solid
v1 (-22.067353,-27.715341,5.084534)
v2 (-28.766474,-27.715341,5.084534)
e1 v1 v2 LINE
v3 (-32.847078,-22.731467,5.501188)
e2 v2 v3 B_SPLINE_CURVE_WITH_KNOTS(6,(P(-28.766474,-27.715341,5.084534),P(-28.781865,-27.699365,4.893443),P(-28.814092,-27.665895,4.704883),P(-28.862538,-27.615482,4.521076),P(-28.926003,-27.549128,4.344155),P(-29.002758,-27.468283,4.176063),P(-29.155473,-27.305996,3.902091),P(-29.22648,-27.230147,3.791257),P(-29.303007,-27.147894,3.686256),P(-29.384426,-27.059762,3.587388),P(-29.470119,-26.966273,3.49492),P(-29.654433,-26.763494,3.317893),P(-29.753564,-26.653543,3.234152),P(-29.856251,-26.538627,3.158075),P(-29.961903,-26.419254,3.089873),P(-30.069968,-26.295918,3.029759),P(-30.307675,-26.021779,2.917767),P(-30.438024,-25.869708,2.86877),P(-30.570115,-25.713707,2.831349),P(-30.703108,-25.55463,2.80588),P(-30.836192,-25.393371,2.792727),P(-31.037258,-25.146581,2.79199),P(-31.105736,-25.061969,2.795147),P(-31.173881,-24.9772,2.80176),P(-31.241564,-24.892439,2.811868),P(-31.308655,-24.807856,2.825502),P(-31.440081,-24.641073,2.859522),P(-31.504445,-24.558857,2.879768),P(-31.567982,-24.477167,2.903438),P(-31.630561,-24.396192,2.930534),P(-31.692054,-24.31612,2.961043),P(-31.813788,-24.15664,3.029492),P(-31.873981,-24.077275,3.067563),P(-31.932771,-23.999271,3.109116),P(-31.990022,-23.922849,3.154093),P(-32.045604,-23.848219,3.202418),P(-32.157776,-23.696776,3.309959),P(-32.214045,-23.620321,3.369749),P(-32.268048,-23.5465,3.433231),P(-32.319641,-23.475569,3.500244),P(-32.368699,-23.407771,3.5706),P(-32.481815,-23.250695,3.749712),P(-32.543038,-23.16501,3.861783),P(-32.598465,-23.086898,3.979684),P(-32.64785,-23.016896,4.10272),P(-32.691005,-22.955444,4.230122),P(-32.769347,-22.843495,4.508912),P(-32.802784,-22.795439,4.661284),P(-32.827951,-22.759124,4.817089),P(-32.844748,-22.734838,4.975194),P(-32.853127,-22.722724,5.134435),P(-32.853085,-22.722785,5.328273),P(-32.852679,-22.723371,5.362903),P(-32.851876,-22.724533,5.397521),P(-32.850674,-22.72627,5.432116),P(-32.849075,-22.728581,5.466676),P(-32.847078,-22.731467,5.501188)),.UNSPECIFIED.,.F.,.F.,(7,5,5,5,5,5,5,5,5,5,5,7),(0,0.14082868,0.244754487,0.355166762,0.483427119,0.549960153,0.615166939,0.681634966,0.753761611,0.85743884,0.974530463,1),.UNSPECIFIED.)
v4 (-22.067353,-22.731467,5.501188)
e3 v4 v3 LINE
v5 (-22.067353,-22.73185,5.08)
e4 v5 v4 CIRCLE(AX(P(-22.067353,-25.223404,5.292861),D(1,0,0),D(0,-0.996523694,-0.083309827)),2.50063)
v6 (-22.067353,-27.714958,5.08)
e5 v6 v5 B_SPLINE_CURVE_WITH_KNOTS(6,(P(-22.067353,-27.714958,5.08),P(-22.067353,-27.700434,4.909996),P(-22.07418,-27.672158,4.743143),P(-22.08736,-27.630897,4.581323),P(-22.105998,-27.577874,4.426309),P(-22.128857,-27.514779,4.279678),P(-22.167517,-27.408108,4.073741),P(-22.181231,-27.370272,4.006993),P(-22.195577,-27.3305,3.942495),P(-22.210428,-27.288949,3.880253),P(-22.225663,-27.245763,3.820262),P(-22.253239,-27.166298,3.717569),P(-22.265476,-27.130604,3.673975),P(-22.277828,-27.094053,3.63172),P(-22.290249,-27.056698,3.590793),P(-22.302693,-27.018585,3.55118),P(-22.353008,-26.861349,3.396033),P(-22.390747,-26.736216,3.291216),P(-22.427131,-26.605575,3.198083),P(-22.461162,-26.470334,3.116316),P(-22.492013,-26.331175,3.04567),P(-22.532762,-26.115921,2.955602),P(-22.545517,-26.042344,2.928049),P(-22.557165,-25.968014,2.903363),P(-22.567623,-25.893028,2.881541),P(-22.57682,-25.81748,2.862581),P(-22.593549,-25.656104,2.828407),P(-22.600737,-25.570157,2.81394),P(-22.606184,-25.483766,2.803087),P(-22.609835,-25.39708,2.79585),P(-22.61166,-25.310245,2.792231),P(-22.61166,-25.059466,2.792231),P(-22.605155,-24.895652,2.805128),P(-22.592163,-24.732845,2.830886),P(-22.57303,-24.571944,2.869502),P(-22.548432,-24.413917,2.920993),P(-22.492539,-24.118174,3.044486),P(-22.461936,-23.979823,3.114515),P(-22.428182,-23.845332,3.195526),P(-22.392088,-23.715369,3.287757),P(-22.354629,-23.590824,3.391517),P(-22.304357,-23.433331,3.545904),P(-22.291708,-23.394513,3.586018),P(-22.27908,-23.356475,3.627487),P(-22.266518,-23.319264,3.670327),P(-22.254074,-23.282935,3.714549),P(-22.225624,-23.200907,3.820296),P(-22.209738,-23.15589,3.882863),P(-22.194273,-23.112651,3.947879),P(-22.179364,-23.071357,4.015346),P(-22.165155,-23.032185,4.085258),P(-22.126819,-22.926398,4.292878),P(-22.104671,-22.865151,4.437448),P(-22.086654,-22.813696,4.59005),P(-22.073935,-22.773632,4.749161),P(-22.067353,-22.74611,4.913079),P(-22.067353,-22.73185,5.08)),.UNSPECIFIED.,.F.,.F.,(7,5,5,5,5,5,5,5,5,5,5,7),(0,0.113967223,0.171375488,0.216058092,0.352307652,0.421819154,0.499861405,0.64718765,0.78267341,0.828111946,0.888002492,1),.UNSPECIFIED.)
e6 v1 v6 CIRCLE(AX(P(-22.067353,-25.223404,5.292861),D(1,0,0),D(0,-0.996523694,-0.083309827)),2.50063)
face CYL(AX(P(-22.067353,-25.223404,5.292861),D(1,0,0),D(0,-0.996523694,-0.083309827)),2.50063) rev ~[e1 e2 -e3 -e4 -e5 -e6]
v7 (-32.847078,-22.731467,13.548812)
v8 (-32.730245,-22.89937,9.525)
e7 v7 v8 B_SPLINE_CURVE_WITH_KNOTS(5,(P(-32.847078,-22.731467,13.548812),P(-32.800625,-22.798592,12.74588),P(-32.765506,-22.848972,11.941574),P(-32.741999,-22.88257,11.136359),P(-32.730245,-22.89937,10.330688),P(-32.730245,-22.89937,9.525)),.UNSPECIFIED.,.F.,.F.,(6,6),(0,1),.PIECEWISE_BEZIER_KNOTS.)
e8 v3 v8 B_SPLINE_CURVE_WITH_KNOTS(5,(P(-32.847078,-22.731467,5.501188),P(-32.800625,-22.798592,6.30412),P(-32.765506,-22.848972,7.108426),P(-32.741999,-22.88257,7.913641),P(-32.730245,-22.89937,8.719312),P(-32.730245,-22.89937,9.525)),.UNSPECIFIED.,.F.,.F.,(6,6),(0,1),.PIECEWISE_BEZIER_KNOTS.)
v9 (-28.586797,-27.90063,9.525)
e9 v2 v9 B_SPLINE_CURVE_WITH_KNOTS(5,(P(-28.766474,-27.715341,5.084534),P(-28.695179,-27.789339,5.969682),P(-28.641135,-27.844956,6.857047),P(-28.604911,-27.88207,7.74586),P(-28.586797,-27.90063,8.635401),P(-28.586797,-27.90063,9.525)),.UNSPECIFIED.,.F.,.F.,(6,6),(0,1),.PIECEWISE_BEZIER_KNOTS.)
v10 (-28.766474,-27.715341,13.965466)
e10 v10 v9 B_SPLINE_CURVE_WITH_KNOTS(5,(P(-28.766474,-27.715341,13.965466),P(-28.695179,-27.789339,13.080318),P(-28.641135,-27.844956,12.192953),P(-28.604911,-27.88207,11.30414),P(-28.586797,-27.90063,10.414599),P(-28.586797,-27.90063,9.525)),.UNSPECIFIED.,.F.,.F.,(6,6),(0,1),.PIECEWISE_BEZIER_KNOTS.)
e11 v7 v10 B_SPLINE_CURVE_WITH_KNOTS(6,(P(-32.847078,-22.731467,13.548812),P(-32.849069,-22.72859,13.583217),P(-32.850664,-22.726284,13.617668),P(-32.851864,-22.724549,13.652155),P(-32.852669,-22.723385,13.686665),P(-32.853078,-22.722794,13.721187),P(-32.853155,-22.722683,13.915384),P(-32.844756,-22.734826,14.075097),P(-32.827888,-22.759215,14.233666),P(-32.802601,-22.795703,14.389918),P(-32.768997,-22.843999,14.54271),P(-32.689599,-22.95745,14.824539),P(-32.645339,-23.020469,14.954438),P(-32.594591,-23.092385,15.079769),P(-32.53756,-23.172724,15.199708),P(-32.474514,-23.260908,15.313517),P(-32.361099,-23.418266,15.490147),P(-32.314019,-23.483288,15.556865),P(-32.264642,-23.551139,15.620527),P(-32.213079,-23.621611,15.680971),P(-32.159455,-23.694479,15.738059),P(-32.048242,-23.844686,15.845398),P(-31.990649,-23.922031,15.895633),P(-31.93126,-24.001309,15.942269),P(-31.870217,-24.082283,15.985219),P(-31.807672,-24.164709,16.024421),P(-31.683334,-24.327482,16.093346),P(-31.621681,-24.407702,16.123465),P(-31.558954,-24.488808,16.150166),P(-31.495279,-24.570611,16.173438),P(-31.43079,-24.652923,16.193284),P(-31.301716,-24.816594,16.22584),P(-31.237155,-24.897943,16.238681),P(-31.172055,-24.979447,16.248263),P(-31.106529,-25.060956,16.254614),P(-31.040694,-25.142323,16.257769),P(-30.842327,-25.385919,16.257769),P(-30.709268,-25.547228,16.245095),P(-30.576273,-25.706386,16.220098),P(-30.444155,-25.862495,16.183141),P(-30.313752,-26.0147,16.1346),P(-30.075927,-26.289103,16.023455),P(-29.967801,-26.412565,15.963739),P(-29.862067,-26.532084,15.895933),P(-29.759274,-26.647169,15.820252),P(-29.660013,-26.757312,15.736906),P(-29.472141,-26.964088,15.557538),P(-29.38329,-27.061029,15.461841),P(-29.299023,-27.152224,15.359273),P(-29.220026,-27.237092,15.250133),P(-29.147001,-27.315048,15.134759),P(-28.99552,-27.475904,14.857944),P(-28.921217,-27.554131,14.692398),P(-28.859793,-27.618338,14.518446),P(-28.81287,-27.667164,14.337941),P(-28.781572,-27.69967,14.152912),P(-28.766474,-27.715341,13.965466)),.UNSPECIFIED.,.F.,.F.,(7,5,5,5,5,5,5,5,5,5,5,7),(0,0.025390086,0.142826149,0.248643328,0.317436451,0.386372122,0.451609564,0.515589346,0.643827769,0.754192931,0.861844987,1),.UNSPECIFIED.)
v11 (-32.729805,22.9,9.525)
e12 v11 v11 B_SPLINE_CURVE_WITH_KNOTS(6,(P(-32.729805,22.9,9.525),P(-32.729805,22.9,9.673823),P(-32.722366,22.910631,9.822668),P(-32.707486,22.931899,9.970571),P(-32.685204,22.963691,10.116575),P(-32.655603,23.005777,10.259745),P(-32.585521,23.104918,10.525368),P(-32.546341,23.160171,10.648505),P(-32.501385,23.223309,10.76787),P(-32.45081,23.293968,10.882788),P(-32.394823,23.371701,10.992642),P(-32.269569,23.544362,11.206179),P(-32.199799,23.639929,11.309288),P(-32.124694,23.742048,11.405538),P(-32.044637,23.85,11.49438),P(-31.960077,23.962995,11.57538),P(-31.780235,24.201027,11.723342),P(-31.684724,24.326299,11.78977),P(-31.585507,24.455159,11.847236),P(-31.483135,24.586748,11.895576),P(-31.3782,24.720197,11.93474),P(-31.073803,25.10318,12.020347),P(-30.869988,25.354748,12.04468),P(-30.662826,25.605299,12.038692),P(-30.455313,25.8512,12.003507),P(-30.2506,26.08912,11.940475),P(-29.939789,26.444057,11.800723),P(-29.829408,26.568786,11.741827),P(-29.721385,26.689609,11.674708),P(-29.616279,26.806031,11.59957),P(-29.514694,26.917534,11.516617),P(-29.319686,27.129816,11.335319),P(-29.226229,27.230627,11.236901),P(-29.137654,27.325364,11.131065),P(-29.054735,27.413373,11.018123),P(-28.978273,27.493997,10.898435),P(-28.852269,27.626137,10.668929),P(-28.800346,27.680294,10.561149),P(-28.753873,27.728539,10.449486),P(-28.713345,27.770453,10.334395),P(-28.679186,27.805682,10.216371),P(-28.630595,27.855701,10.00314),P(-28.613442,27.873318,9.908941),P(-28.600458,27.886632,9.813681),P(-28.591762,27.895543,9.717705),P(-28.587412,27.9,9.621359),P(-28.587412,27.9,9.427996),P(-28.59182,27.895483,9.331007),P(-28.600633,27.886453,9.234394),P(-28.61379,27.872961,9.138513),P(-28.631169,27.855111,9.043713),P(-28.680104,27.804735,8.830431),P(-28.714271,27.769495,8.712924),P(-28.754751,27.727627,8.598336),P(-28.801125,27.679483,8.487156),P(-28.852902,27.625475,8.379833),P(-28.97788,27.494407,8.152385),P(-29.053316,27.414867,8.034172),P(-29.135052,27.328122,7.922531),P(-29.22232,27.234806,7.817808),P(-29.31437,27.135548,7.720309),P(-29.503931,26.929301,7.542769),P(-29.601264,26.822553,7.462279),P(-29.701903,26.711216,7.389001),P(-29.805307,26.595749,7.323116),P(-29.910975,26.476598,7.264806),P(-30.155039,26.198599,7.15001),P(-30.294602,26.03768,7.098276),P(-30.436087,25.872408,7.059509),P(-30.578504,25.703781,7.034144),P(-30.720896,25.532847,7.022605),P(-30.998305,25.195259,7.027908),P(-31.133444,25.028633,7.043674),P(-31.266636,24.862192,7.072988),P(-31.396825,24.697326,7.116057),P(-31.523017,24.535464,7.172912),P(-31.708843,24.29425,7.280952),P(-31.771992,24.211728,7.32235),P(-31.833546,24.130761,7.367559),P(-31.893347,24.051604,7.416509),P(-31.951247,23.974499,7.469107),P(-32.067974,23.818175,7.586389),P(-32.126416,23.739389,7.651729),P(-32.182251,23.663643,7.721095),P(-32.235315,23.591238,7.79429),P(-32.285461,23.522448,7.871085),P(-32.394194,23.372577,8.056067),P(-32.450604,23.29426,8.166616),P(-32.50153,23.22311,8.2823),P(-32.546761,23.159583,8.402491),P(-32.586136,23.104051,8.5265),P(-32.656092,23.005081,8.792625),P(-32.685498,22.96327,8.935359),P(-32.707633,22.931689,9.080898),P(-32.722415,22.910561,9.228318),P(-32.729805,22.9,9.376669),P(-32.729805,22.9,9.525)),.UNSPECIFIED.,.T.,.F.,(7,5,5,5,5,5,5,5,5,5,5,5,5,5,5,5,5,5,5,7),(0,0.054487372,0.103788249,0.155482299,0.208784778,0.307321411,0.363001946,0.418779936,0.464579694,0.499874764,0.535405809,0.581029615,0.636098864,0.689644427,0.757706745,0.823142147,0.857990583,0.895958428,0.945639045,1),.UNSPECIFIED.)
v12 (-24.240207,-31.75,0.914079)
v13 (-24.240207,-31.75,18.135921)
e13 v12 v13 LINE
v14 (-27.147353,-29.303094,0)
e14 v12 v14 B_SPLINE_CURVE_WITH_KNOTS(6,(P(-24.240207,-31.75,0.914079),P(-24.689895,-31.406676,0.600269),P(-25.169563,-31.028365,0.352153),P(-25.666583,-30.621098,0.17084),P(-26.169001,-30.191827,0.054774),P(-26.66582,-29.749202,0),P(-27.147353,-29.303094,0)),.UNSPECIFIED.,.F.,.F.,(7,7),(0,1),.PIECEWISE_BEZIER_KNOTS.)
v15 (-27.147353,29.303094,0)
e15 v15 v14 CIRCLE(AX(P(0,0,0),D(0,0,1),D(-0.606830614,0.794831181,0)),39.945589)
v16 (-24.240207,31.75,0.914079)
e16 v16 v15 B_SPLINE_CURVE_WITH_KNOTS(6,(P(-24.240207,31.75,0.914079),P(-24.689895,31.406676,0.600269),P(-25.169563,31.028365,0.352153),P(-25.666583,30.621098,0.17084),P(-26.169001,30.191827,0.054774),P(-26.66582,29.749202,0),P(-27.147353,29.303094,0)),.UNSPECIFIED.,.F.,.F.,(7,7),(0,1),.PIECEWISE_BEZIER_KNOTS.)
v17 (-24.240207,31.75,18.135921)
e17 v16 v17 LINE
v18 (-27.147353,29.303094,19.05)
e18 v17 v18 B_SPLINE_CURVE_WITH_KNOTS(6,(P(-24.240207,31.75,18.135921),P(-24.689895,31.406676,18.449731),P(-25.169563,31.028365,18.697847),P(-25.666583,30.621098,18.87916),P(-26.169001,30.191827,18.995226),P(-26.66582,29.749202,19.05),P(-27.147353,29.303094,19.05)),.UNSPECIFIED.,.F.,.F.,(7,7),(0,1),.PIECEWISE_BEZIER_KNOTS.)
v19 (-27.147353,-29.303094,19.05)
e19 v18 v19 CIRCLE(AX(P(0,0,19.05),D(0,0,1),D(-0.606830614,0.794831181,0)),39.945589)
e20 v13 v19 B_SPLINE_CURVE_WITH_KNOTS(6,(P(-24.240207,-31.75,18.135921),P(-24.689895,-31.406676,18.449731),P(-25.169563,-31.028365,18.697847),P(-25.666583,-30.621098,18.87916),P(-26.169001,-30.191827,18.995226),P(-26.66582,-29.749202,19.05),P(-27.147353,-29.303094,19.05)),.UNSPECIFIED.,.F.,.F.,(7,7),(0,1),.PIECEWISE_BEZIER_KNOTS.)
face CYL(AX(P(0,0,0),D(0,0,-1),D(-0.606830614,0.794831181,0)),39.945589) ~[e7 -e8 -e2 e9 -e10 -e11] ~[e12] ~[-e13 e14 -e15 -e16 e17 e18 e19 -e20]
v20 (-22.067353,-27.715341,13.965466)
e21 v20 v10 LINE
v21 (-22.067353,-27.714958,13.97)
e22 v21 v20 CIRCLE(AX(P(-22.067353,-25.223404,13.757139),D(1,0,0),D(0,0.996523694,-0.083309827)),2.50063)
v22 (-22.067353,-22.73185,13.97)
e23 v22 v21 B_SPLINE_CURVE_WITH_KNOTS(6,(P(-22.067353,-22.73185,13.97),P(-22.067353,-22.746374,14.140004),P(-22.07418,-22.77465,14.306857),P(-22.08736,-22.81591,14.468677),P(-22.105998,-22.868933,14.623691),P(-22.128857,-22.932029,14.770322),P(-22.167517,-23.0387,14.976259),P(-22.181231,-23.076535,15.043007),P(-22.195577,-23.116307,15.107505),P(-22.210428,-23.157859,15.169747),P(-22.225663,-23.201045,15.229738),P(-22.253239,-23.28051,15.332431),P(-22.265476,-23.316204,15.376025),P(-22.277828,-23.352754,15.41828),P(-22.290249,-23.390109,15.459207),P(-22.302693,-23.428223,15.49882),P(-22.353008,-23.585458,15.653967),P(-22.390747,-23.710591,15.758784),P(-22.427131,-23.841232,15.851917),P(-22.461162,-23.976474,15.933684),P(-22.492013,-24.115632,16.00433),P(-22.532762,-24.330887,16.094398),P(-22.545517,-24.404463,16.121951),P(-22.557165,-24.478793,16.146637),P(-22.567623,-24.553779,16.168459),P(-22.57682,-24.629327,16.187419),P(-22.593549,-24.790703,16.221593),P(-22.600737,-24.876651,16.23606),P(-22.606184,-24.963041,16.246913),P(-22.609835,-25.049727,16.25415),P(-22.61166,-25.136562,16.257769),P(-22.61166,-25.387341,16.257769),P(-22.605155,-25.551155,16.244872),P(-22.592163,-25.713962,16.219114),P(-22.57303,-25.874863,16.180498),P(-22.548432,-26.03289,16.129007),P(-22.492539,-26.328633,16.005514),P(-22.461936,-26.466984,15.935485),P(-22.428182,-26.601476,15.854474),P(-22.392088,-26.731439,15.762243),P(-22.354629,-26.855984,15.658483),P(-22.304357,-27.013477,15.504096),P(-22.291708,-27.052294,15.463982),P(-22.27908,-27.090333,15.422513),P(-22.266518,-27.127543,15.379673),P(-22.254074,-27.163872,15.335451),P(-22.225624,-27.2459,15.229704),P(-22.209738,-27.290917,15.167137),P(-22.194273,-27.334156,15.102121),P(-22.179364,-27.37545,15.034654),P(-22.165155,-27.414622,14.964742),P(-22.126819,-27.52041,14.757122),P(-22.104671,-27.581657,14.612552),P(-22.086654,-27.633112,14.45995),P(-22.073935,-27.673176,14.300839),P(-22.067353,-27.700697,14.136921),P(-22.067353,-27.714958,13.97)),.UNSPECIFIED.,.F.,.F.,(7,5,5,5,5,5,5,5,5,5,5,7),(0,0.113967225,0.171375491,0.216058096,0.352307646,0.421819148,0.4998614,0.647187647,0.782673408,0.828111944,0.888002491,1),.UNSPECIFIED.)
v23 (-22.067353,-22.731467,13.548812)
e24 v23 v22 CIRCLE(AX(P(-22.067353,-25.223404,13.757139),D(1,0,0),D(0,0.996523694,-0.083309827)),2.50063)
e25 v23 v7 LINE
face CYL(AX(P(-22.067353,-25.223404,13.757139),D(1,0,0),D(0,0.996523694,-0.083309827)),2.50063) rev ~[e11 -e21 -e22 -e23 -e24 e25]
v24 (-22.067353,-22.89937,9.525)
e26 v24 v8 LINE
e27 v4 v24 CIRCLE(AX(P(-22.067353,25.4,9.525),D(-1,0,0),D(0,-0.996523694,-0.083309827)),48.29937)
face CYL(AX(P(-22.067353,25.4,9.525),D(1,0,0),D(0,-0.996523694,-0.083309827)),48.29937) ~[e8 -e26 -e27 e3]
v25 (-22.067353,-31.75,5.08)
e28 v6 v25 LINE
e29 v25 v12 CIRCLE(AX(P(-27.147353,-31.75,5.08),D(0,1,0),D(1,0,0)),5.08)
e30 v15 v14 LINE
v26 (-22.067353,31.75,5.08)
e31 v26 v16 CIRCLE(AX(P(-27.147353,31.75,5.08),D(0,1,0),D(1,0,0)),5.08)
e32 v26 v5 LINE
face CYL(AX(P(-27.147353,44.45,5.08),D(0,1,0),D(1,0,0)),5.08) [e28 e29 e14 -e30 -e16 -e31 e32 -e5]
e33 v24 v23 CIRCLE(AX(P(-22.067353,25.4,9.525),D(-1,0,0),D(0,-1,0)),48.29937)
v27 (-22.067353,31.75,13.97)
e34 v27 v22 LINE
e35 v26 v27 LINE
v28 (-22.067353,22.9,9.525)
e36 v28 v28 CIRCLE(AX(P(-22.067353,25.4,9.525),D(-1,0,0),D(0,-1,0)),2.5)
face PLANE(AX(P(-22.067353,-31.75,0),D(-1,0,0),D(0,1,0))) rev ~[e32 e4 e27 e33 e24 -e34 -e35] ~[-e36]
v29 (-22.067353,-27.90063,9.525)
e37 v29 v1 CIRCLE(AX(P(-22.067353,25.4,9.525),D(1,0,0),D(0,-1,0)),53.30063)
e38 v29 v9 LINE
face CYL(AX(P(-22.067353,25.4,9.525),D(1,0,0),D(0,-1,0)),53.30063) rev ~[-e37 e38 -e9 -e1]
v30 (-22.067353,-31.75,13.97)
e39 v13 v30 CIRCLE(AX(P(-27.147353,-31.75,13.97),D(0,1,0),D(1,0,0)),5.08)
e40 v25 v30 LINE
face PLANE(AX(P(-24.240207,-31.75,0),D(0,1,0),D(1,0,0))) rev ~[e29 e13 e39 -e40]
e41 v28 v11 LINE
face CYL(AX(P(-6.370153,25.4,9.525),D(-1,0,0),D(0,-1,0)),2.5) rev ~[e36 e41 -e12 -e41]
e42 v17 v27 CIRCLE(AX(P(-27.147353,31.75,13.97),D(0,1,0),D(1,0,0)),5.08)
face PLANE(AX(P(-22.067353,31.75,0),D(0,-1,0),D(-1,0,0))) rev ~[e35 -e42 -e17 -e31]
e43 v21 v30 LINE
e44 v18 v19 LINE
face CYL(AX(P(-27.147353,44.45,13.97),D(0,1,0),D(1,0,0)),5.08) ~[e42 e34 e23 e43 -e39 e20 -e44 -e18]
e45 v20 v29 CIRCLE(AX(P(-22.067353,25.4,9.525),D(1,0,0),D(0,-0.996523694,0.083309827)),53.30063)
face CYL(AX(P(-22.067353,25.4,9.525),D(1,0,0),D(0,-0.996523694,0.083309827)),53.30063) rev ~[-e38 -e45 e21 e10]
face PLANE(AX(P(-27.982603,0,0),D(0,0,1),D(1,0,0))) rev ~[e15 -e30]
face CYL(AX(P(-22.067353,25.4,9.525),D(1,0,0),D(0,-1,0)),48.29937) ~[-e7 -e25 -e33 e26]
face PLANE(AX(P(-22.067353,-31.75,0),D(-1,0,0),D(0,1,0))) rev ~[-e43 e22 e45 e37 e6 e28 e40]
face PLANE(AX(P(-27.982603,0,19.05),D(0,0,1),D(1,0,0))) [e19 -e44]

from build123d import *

# Parameters (mm, degrees)
F1_DEPTH    = 19.05
F3_DEPTH    = 25.4
F4_D        = 5
F4_DEPTH    = 15.6972
F4_TIP      = 1.5021515476
F5_T1_DEPTH = 88.9


# Not quite as in the source:
# - a fillet or chamfer that OpenCascade refuses, or shapes differently, is made with other operations: its cross-section is extruded or revolved along the edge and cut away or added


with BuildPart() as f1:
    # F0 (on Top) → F1 (new body)
    with BuildSketch(Plane.XY):
        with BuildLine():
            Line((-22.0673531294, 31.75), (-24.2402065279, 31.75))
            ThreePointArc((-24.2402065279, 31.75), (-39.9455894, 0), (-24.2402065279, -31.75))
            Line((-24.2402065279, -31.75), (-22.0673531294, -31.75))
            Line((-22.0673531294, -31.75), (-22.0673531294, 31.75))
        make_face()
    extrude(amount=F1_DEPTH)

    # F2 (on face) → F3 (cut)
    with BuildSketch(Plane.YZ.offset(-22.0673531294)):
        with BuildLine():
            ThreePointArc((-27.7153407028, 13.9654662391), (-27.8542875294, 11.747165191), (-27.90063, 9.525))
            Line((-27.90063, 9.525), (-22.89937, 9.525))
            ThreePointArc((-22.89937, 9.525), (-22.8573758972, 11.538656851), (-22.7314666127, 13.5488121361))
            ThreePointArc((-22.7314666127, 13.5488121361), (-25.0150766063, 16.2490762326), (-27.7153407028, 13.9654662391))
        make_face()
        with BuildLine():
            Line((-22.89937, 9.525), (-27.90063, 9.525))
            ThreePointArc((-27.90063, 9.525), (-27.8542875294, 7.302834809), (-27.7153407028, 5.0845337609))
            ThreePointArc((-27.7153407028, 5.0845337609), (-25.0150766063, 2.8009237674), (-22.7314666127, 5.5011878639))
            ThreePointArc((-22.7314666127, 5.5011878639), (-22.8573758972, 7.511343149), (-22.89937, 9.525))
        make_face()
    extrude(amount=-F3_DEPTH, mode=Mode.SUBTRACT)

    # F4
    with Locations(Plane.YZ.offset(-22.0673531294)):
        with Locations((25.4, 9.525)):
            Hole(F4_D / 2, depth=F4_DEPTH)
            with Locations((0, 0, -(F4_DEPTH + F4_TIP / 2))):  # 118° drill point
                Cone(0, F4_D / 2, F4_TIP, mode=Mode.SUBTRACT)

    # F5: fillet of radius 5.08 on 2 edges, made by hand

    # F5_s2 → F5_t1 (cut)
    with BuildSketch(Plane.XZ.offset(-44.45)):
        with BuildLine():
            ThreePointArc((-22.0673531294, 13.97), (-23.555250681, 17.5621024484), (-27.1473531294, 19.05))
            Line((-27.1473531294, 19.05), (-22.0673531294, 19.05))
            Line((-22.0673531294, 19.05), (-22.0673531294, 13.97))
        make_face()
        with BuildLine():
            ThreePointArc((-22.0673531294, 5.08), (-23.555250681, 1.4878975516), (-27.1473531294, 0))
            Line((-27.1473531294, 0), (-22.0673531294, 0))
            Line((-22.0673531294, 0), (-22.0673531294, 5.08))
        make_face()
    extrude(amount=F5_T1_DEPTH, mode=Mode.SUBTRACT)


solid = f1.part
